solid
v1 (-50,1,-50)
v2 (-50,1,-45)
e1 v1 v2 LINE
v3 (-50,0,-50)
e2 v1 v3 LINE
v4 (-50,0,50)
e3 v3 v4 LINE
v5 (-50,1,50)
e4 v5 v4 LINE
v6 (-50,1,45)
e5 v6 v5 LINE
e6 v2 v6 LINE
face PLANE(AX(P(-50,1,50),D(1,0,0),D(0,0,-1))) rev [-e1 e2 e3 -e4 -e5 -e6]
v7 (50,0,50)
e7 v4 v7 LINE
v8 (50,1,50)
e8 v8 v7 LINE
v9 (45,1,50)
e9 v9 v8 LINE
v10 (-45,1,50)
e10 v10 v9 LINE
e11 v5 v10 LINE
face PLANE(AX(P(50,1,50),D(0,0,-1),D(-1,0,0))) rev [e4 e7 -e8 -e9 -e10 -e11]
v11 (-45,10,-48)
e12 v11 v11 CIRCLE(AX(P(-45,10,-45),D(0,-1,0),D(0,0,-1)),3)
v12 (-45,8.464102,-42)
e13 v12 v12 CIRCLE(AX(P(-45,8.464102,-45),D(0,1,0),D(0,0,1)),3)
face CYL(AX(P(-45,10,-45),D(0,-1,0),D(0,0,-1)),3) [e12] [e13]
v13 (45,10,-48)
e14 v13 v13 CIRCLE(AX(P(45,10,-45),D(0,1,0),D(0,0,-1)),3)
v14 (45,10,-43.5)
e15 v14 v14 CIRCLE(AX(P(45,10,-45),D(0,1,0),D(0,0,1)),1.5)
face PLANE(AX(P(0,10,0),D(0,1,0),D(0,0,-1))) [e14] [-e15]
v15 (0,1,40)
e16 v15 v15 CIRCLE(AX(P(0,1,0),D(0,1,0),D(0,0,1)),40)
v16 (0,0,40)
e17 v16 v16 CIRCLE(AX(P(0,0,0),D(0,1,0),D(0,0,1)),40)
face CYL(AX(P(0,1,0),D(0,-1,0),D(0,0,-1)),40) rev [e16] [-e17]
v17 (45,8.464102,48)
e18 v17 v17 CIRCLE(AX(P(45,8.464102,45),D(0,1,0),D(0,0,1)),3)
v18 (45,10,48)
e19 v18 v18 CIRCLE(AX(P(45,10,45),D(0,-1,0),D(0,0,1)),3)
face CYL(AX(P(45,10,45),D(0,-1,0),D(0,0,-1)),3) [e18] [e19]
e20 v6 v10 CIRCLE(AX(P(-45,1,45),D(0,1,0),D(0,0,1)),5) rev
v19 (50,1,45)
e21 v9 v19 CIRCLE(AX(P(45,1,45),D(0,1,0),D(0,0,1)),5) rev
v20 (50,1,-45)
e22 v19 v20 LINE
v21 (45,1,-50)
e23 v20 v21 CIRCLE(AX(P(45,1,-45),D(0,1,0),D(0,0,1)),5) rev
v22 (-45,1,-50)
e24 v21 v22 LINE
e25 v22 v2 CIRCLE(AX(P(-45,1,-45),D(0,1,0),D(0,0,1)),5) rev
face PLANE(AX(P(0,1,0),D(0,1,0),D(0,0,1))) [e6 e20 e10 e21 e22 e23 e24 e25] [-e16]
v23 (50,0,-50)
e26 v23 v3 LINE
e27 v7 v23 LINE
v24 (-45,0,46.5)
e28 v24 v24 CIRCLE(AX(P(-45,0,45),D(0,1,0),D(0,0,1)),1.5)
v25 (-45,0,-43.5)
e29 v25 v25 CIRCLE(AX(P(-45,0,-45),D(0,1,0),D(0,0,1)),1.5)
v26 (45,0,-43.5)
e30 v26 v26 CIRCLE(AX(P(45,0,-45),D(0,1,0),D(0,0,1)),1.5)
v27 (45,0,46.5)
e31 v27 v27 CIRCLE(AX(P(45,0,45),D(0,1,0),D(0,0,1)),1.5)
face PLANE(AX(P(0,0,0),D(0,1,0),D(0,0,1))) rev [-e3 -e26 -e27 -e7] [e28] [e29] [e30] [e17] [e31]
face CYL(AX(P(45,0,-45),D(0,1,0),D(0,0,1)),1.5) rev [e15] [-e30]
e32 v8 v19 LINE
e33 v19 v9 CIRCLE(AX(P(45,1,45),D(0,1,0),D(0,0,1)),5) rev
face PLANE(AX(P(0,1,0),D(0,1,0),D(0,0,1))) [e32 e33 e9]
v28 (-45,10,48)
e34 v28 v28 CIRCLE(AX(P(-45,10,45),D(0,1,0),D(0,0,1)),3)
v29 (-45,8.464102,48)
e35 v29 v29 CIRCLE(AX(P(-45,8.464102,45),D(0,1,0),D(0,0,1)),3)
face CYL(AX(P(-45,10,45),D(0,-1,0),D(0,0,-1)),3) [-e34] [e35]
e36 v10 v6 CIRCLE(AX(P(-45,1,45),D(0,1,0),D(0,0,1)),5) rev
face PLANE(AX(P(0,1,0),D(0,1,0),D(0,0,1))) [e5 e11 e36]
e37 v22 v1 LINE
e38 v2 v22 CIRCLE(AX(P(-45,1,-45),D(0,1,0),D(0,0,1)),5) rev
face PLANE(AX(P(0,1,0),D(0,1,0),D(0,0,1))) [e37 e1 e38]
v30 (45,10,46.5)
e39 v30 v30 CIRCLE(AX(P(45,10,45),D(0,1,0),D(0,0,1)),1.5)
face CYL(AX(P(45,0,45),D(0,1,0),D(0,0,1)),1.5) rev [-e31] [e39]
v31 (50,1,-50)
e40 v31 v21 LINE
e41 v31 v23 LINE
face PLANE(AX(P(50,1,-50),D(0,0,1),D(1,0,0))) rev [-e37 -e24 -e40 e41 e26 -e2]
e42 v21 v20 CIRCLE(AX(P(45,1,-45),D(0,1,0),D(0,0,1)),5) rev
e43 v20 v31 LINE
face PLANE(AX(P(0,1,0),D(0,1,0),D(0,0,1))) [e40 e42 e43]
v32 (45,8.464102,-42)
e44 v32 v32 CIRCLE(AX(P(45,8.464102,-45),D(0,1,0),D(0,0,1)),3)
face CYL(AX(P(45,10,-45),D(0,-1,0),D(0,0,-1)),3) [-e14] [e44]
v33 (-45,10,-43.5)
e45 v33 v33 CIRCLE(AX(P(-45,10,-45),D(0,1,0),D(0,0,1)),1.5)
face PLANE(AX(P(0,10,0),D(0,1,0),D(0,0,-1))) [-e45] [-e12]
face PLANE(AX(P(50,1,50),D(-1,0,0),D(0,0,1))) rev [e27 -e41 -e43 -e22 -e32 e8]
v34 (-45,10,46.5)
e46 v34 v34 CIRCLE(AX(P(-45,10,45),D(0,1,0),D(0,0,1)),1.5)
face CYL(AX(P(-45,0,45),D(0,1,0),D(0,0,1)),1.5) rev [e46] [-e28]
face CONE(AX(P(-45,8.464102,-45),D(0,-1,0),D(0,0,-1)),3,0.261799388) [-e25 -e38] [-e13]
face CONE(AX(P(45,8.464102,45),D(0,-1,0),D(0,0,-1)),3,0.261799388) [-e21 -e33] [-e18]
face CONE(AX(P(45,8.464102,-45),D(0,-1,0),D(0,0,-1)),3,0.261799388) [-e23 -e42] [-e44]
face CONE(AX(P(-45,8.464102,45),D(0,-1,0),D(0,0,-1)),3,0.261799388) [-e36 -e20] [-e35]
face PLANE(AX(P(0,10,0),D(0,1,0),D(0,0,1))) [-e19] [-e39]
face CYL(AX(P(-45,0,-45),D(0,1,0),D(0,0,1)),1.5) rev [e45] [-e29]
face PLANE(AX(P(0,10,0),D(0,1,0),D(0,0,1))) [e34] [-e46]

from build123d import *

# Parameters (mm, degrees)
SKETCH1_W                 = 100
SKETCH1_H                 = 100
SKETCH1_R                 = 40
BOSS_EXTRUDE1_DEPTH       = 1
SKETCH2_R                 = 3
SKETCH2_R_2               = 1.5
BOSS_EXTRUDE2_DEPTH       = 9
CUT_EXTRUDE1_START        = 9
SKETCH2_3_R               = 1.5
CUT_EXTRUDE1_DEPTH        = 10
MIRROR2_COPY_1_SKETCH_R   = 3
MIRROR2_COPY_1_SKETCH_R_2 = 1.5
MIRROR2_COPY_1_DEPTH      = 9
MIRROR2_START             = 9
MIRROR2_COPY_2_SKETCH_R   = 1.5
MIRROR2_COPY_2_DEPTH      = 10
CHAMFER1_SIZE             = 2
CHAMFER1_SIZE_2           = 7.464101615


with BuildPart() as part:
    # Sketch1 → Boss-Extrude1 (new body)
    with BuildSketch(Plane(origin=(0, 0, 0), x_dir=(1, 0, 0), z_dir=(0, 1, 0))):
        Rectangle(SKETCH1_W, SKETCH1_H)
        with Locations(Location((0, 0, 0), (0, 0, 270))):
            Circle(SKETCH1_R, mode=Mode.SUBTRACT)
    extrude(amount=BOSS_EXTRUDE1_DEPTH)

    # Sketch2 → Boss-Extrude2 (add)
    # profile 1 of 2: a face of its own
    with BuildSketch(Plane(origin=(0, 1, 0), x_dir=(1, 0, 0), z_dir=(0, 1, 0))):
        with Locations(Location((-45, -45, 0), (0, 0, 270))):
            Circle(SKETCH2_R)
        with Locations((-45, -45)):
            Circle(SKETCH2_R_2, mode=Mode.SUBTRACT)
    # profile 2 of 2: a face of its own
    with BuildSketch(Plane(origin=(0, 1, 0), x_dir=(1, 0, 0), z_dir=(0, 1, 0))):
        with Locations((-45, -45)):
            Circle(SKETCH2_R_2)
    boss_extrude2 = extrude(amount=BOSS_EXTRUDE2_DEPTH)

    # Sketch2<3> → Cut-Extrude1 (cut)
    with BuildSketch(Plane(origin=(0, 1, 0), x_dir=(1, 0, 0), z_dir=(0, 1, 0)).offset(CUT_EXTRUDE1_START)):
        with Locations(Location((-45, -45, 0), (0, 0, 270))):
            Circle(SKETCH2_3_R)
    cut_extrude1 = extrude(amount=-CUT_EXTRUDE1_DEPTH, mode=Mode.SUBTRACT)

    # Mirror1: Boss-Extrude2, Cut-Extrude1 across plane
    add(boss_extrude2.mirror(Plane(origin=(0, 0, 0), x_dir=(0, 0, 1), z_dir=(1, 0, 0))))
    add(cut_extrude1.mirror(Plane(origin=(0, 0, 0), x_dir=(0, 0, 1), z_dir=(1, 0, 0))), mode=Mode.SUBTRACT)

    # Mirror2: Boss-Extrude2, Cut-Extrude1 across plane
    add(boss_extrude2.mirror(Plane.XY))
    add(cut_extrude1.mirror(Plane.XY), mode=Mode.SUBTRACT)

    # Mirror2 copy 1 sketch → Mirror2 copy 1 (add)
    # profile 1 of 2: a face of its own
    with BuildSketch(Plane(origin=(0, 1, 0), x_dir=(-1, 0, 0), z_dir=(0, 1, 0))):
        with Locations(Location((-45, -45, 0), (0, 0, 270))):
            Circle(MIRROR2_COPY_1_SKETCH_R)
        with Locations((-45, -45)):
            Circle(MIRROR2_COPY_1_SKETCH_R_2, mode=Mode.SUBTRACT)
    # profile 2 of 2: a face of its own
    with BuildSketch(Plane(origin=(0, 1, 0), x_dir=(-1, 0, 0), z_dir=(0, 1, 0))):
        with Locations((-45, -45)):
            Circle(MIRROR2_COPY_1_SKETCH_R_2)
    extrude(amount=MIRROR2_COPY_1_DEPTH)

    # Mirror2 copy 2 sketch → Mirror2 copy 2 (cut)
    with BuildSketch(Plane(origin=(0, 1, 0), x_dir=(-1, 0, 0), z_dir=(0, 1, 0)).offset(MIRROR2_START)):
        with Locations(Location((-45, -45, 0), (0, 0, 270))):
            Circle(MIRROR2_COPY_2_SKETCH_R)
    extrude(amount=-MIRROR2_COPY_2_DEPTH, mode=Mode.SUBTRACT)

    # Chamfer1
    # the kernel refuses this chamfer: 7.464101615, 2 mm, written as the material it adds along each edge
    with BuildSketch(Plane(origin=(-45, 1, 45), x_dir=(0, 0, 1), z_dir=(-1, 0, 0))) as chamfer1_piece_1_section:
        Polygon((3 + CHAMFER1_SIZE, 0), (3, CHAMFER1_SIZE_2), (3, 0), align=None)
    chamfer1_piece_1 = revolve(axis=Axis((-45, 1, 45), (0, 1, 0)), mode=Mode.PRIVATE)
    chamfer1_piece_1 = split(chamfer1_piece_1, bisect_by=Plane(origin=(-45, 4.716774414, 50), z_dir=(0, 0, -1)), keep=Keep.TOP, mode=Mode.PRIVATE)
    chamfer1_piece_1 = split(chamfer1_piece_1, bisect_by=Plane(origin=(-50, 4.716774414, 41.057012278), z_dir=(1, 0, 0)), keep=Keep.TOP, mode=Mode.PRIVATE)
    add(chamfer1_piece_1)
    with BuildSketch(Plane(origin=(45, 1, 45), x_dir=(0, 0, 1), z_dir=(1, 0, 0))) as chamfer1_piece_2_section:
        Polygon((3 + CHAMFER1_SIZE, 0), (3, -CHAMFER1_SIZE_2), (3, 0), align=None)
    chamfer1_piece_2 = revolve(axis=Axis((45, 1, 45), (0, -1, 0)), mode=Mode.PRIVATE)
    chamfer1_piece_2 = split(chamfer1_piece_2, bisect_by=Plane(origin=(45, 4.716774414, 50), z_dir=(0, 0, -1)), keep=Keep.TOP, mode=Mode.PRIVATE)
    chamfer1_piece_2 = split(chamfer1_piece_2, bisect_by=Plane(origin=(50, 4.716774414, 41.057012278), z_dir=(-1, 0, 0)), keep=Keep.TOP, mode=Mode.PRIVATE)
    add(chamfer1_piece_2)
    with BuildSketch(Plane(origin=(45, 1, -45), x_dir=(0, 0, -1), z_dir=(1, 0, 0))) as chamfer1_piece_3_section:
        Polygon((3 + CHAMFER1_SIZE, 0), (3, CHAMFER1_SIZE_2), (3, 0), align=None)
    chamfer1_piece_3 = revolve(axis=Axis((45, 1, -45), (0, 1, 0)), mode=Mode.PRIVATE)
    chamfer1_piece_3 = split(chamfer1_piece_3, bisect_by=Plane(origin=(50, 4.716774414, -41.057012278), z_dir=(-1, 0, 0)), keep=Keep.TOP, mode=Mode.PRIVATE)
    chamfer1_piece_3 = split(chamfer1_piece_3, bisect_by=Plane(origin=(45, 4.716774414, -50), z_dir=(0, 0, 1)), keep=Keep.TOP, mode=Mode.PRIVATE)
    add(chamfer1_piece_3)
    with BuildSketch(Plane(origin=(-45, 1, -45), x_dir=(0, 0, -1), z_dir=(-1, 0, 0))) as chamfer1_piece_4_section:
        Polygon((3 + CHAMFER1_SIZE, 0), (3, -CHAMFER1_SIZE_2), (3, 0), align=None)
    chamfer1_piece_4 = revolve(axis=Axis((-45, 1, -45), (0, -1, 0)), mode=Mode.PRIVATE)
    chamfer1_piece_4 = split(chamfer1_piece_4, bisect_by=Plane(origin=(-50, 4.716774414, -41.057012278), z_dir=(1, 0, 0)), keep=Keep.TOP, mode=Mode.PRIVATE)
    chamfer1_piece_4 = split(chamfer1_piece_4, bisect_by=Plane(origin=(-45, 4.716774414, -50), z_dir=(0, 0, 1)), keep=Keep.TOP, mode=Mode.PRIVATE)
    add(chamfer1_piece_4)


solid = part.part
